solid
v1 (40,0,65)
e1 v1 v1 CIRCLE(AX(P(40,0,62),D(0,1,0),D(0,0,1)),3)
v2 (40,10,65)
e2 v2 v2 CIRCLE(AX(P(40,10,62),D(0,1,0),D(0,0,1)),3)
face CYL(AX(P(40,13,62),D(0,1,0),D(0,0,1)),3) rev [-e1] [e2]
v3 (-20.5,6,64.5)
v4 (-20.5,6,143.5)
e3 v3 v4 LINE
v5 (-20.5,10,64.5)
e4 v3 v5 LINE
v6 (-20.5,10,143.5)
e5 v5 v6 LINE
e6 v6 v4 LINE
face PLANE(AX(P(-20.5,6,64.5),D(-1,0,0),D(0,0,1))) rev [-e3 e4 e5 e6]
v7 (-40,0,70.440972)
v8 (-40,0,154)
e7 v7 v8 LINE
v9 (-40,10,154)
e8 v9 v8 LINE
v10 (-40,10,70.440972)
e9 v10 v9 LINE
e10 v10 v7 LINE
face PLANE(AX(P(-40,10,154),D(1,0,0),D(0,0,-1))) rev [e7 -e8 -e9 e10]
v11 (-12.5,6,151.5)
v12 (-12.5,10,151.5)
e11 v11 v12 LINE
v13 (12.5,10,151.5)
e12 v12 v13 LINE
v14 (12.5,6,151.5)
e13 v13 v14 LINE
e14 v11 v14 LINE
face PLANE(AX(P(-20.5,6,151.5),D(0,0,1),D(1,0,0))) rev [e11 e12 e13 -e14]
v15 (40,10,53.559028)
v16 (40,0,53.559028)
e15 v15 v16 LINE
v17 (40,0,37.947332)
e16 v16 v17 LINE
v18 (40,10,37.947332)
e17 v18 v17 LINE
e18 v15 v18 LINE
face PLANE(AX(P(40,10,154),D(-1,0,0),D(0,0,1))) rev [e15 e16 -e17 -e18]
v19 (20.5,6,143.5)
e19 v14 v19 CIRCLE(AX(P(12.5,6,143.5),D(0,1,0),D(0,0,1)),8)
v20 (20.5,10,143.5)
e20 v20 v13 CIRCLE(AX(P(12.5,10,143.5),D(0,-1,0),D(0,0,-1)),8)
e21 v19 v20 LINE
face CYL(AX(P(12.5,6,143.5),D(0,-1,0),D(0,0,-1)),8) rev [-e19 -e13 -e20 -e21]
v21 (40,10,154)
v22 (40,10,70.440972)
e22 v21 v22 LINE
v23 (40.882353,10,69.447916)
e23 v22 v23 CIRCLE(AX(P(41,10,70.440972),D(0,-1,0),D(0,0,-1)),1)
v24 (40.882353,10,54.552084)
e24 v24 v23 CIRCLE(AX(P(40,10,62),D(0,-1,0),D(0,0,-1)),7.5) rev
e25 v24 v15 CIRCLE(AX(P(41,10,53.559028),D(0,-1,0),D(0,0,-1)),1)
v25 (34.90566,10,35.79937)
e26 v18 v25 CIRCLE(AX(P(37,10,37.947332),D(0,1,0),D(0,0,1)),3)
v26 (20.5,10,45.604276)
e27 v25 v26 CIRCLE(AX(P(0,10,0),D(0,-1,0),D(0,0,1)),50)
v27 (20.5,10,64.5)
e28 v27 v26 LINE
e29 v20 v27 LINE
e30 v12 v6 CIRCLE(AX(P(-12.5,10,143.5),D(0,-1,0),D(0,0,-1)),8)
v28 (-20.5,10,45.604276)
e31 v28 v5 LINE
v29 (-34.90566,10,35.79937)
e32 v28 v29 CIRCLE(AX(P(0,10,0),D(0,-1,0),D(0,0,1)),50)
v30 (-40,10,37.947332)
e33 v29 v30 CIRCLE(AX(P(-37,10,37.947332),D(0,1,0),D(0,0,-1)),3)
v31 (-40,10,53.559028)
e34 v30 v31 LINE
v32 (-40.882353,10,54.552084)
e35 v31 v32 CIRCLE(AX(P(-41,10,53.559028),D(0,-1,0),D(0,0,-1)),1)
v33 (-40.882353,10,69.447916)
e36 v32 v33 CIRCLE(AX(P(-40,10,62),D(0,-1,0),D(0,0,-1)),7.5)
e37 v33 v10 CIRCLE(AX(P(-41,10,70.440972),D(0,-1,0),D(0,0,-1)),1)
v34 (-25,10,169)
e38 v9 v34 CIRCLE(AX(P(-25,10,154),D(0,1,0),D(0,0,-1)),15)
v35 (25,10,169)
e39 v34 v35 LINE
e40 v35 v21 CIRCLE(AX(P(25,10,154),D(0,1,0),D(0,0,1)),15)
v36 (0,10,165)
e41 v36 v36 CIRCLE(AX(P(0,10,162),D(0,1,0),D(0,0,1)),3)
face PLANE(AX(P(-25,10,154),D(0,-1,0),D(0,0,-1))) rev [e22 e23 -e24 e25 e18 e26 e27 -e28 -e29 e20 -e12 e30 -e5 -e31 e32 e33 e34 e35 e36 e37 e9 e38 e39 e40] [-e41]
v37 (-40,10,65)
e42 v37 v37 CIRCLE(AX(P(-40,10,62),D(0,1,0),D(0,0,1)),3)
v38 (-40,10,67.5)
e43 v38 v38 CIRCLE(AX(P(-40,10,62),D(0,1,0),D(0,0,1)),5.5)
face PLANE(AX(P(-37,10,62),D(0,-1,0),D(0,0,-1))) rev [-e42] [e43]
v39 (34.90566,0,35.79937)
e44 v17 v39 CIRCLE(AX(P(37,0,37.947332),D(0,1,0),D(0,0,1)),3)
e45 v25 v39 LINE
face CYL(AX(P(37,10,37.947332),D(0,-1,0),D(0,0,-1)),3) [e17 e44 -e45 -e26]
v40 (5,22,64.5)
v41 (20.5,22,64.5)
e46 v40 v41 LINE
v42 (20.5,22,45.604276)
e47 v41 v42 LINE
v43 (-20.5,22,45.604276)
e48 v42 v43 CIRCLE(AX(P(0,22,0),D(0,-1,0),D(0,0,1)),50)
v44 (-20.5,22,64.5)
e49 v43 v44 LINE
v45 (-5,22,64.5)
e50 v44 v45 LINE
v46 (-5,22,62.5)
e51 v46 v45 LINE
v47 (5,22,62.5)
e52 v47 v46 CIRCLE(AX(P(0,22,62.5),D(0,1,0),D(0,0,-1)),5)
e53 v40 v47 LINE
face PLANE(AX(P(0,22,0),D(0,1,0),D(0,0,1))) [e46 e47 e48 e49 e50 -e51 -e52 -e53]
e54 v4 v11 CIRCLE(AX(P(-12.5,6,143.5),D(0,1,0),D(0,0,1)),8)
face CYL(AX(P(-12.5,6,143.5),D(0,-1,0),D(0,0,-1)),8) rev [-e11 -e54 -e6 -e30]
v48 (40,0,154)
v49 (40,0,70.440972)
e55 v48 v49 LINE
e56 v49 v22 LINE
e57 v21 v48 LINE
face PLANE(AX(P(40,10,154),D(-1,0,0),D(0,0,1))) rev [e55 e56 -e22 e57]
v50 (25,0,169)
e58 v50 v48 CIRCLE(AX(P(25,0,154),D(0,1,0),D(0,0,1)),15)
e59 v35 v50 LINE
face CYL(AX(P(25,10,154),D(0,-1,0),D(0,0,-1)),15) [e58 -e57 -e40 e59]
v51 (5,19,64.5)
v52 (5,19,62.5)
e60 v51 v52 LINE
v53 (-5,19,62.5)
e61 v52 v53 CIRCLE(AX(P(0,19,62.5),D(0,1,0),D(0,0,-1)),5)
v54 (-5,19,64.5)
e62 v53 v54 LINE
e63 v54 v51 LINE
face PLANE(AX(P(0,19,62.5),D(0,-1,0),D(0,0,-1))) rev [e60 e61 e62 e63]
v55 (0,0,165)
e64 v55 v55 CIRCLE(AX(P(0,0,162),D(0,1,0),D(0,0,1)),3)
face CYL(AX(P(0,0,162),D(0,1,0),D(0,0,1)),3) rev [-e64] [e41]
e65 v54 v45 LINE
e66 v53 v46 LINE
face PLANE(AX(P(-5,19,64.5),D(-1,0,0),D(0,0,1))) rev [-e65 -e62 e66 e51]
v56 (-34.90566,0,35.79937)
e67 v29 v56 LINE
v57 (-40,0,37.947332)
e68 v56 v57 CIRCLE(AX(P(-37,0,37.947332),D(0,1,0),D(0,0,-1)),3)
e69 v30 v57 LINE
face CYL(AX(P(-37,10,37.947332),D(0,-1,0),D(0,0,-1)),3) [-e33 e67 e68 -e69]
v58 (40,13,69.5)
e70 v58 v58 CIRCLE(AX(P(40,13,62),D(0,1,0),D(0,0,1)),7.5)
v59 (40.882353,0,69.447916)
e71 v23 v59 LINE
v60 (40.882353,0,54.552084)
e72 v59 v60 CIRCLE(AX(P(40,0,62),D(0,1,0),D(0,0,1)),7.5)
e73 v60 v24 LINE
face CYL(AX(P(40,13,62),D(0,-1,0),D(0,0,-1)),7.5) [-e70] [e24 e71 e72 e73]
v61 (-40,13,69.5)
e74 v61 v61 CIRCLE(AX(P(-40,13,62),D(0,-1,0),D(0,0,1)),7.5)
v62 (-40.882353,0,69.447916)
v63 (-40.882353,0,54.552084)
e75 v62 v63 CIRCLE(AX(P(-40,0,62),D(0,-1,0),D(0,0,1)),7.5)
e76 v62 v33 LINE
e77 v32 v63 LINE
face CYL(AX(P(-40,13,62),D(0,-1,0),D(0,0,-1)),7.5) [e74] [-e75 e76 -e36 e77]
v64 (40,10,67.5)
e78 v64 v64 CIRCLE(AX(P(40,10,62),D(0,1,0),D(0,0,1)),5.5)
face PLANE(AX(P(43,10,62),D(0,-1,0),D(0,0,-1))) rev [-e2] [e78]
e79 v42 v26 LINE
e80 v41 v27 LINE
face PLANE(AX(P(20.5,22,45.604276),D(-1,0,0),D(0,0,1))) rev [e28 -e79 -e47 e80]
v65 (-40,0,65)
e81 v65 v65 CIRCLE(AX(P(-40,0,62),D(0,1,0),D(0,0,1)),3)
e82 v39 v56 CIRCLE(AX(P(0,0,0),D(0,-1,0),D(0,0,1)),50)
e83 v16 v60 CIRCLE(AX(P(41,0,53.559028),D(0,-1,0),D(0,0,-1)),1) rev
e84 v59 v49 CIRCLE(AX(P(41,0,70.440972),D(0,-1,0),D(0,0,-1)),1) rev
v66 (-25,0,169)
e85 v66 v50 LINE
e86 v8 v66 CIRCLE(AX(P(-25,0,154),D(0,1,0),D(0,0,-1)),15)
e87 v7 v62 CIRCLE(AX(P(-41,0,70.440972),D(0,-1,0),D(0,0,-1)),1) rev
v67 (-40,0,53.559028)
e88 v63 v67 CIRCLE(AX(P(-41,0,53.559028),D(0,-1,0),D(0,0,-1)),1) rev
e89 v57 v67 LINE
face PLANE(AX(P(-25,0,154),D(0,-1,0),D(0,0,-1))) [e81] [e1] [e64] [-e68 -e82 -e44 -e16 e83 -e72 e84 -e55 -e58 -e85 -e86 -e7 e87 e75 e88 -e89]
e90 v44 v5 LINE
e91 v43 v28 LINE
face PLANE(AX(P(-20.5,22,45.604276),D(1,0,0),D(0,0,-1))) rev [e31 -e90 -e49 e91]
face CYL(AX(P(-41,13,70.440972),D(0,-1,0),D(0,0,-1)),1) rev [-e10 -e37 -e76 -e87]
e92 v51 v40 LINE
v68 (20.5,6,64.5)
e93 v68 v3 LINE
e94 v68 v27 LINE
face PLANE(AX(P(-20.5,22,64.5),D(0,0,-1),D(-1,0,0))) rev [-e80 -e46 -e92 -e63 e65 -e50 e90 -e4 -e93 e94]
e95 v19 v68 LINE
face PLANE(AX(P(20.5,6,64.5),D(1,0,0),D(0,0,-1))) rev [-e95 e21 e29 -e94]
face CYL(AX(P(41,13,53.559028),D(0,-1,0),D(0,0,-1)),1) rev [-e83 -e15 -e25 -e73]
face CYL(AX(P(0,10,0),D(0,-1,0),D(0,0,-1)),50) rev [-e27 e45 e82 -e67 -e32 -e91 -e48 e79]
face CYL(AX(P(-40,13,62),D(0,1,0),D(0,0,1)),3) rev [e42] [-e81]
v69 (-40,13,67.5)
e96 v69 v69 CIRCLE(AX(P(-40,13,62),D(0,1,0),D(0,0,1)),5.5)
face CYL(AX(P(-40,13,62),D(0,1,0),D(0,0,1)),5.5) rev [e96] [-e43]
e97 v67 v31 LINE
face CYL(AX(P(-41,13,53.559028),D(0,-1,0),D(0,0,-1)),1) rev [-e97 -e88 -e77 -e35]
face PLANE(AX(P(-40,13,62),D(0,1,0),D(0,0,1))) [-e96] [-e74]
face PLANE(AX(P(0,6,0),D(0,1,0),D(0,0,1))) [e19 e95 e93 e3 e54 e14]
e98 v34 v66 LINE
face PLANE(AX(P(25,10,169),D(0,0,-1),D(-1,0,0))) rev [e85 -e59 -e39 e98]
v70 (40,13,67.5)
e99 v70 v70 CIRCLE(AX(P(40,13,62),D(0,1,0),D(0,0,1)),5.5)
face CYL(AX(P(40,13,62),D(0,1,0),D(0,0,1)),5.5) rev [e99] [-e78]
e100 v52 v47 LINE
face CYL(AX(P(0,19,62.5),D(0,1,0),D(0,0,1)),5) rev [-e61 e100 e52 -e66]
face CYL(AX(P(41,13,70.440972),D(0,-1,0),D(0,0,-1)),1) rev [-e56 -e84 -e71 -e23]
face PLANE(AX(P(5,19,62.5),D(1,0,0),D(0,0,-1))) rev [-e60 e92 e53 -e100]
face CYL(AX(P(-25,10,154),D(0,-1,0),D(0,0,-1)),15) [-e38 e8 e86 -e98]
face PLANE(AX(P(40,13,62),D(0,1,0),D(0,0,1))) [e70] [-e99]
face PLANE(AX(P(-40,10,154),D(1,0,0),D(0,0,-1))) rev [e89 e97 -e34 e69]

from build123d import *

# Parameters (mm, degrees)
BOSS_EXTRUDE1_DEPTH                     = 10
SKETCH2_R                               = 7.5
BOSS_EXTRUDE2_DEPTH                     = 13
BOSS_EXTRUDE3_DEPTH                     = 12
SKETCH4_W                               = 41
SKETCH4_H                               = 87
CUT_EXTRUDE1_DEPTH                      = 4
CUT_EXTRUDE2_DEPTH                      = 3
CBORE_FOR_M5_HEX_HEAD_BOLT1_D           = 6
CBORE_FOR_M5_HEX_HEAD_BOLT1_CBORE_D     = 11
CBORE_FOR_M5_HEX_HEAD_BOLT1_CBORE_DEPTH = 3
SKETCH8_R                               = 3
CUT_EXTRUDE3_DEPTH                      = 176.958091601
FILLET1_R                               = 8
FILLET2_R                               = 1


with BuildPart() as part:
    # Sketch1 → Boss-Extrude1 (new body)
    with BuildSketch(Plane(origin=(0, 0, 0), x_dir=(1, 0, 0), z_dir=(0, 1, 0))):
        with BuildLine():
            Line((25, -169), (-25, -169))
            ThreePointArc((-25, -169), (-35.606601718, -164.606601718), (-40, -154))
            Line((-40, -154), (-40, -37.947331922))
            ThreePointArc((-40, -37.947331922), (-38.165543035, -35.183003896), (-34.905660377, -35.799369738))
            ThreePointArc((-34.905660377, -35.799369738), (0, -50), (34.905660377, -35.799369738))
            ThreePointArc((34.905660377, -35.799369738), (38.165543035, -35.183003896), (40, -37.947331922))
            Line((40, -37.947331922), (40, -154))
            ThreePointArc((40, -154), (35.606601718, -164.606601718), (25, -169))
        make_face()
    extrude(amount=BOSS_EXTRUDE1_DEPTH)

    # Sketch2 → Boss-Extrude2 (add)
    with BuildSketch(Plane(origin=(0, 0, 0), x_dir=(1, 0, 0), z_dir=(0, 1, 0))):
        with Locations((40, -62)):
            Circle(SKETCH2_R)
    boss_extrude2 = extrude(amount=BOSS_EXTRUDE2_DEPTH)

    # Sketch3 → Boss-Extrude3 (add)
    with BuildSketch(Plane(origin=(0, 10, 0), x_dir=(1, 0, 0), z_dir=(0, 1, 0))):
        with BuildLine():
            Line((-20.5, -45.604276115), (-20.5, -64.5))
            Line((-20.5, -64.5), (20.5, -64.5))
            Line((20.5, -64.5), (20.5, -45.604276115))
            ThreePointArc((20.5, -45.604276115), (0, -50), (-20.5, -45.604276115))
        make_face()
    extrude(amount=BOSS_EXTRUDE3_DEPTH)

    # Sketch4 → Cut-Extrude1 (cut)
    with BuildSketch(Plane(origin=(0, 10, 0), x_dir=(1, 0, 0), z_dir=(0, 1, 0))):
        with Locations((0, -108)):
            Rectangle(SKETCH4_W, SKETCH4_H)
    extrude(amount=-CUT_EXTRUDE1_DEPTH, mode=Mode.SUBTRACT)

    # Sketch5 → Cut-Extrude2 (cut)
    with BuildSketch(Plane(origin=(0, 22, 0), x_dir=(1, 0, 0), z_dir=(0, 1, 0))):
        with BuildLine():
            Line((-5, -64.5), (-5, -62.5))
            ThreePointArc((-5, -62.5), (0, -57.5), (5, -62.5))
            Line((5, -62.5), (5, -64.5))
            Line((5, -64.5), (-5, -64.5))
        make_face()
    extrude(amount=-CUT_EXTRUDE2_DEPTH, mode=Mode.SUBTRACT)

    # CBORE for M5 Hex Head Bolt1 (through all)
    with Locations(Plane(origin=(0, 13, 0), x_dir=(1, 0, 0), z_dir=(0, 1, 0))):
        with Locations((40, -62)):
            cbore_for_m5_hex_head_bolt1 = CounterBoreHole(CBORE_FOR_M5_HEX_HEAD_BOLT1_D / 2, CBORE_FOR_M5_HEX_HEAD_BOLT1_CBORE_D / 2, CBORE_FOR_M5_HEX_HEAD_BOLT1_CBORE_DEPTH)

    # Mirror3: Boss-Extrude2, CBORE for M5 Hex Head Bolt1 across plane
    add(boss_extrude2.mirror(Plane(origin=(0, 0, 0), x_dir=(0, 0, 1), z_dir=(1, 0, 0))))
    add(cbore_for_m5_hex_head_bolt1.mirror(Plane(origin=(0, 0, 0), x_dir=(0, 0, 1), z_dir=(1, 0, 0))), mode=Mode.SUBTRACT)

    # Sketch8 → Cut-Extrude3 (cut, through all)
    with BuildSketch(Plane(origin=(0, 10, 0), x_dir=(1, 0, 0), z_dir=(0, 1, 0))):
        with Locations((0, -162)):
            Circle(SKETCH8_R)
    extrude(amount=-CUT_EXTRUDE3_DEPTH, mode=Mode.SUBTRACT)

    # Fillet1
    fillet1_edges = [part.edges().sort_by_distance(p)[0] for p in [
        (20.5, 8, 151.5),
        (-20.5, 8, 151.5),
    ]]
    fillet(fillet1_edges, radius=FILLET1_R)

    # Fillet2
    fillet2_edges = [part.edges().sort_by_distance(p)[0] for p in [
        (-40, 5, 69.5),
        (-40, 5, 54.5),
        (40, 5, 54.5),
        (40, 5, 69.5),
    ]]
    fillet(fillet2_edges, radius=FILLET2_R)


solid = part.part
